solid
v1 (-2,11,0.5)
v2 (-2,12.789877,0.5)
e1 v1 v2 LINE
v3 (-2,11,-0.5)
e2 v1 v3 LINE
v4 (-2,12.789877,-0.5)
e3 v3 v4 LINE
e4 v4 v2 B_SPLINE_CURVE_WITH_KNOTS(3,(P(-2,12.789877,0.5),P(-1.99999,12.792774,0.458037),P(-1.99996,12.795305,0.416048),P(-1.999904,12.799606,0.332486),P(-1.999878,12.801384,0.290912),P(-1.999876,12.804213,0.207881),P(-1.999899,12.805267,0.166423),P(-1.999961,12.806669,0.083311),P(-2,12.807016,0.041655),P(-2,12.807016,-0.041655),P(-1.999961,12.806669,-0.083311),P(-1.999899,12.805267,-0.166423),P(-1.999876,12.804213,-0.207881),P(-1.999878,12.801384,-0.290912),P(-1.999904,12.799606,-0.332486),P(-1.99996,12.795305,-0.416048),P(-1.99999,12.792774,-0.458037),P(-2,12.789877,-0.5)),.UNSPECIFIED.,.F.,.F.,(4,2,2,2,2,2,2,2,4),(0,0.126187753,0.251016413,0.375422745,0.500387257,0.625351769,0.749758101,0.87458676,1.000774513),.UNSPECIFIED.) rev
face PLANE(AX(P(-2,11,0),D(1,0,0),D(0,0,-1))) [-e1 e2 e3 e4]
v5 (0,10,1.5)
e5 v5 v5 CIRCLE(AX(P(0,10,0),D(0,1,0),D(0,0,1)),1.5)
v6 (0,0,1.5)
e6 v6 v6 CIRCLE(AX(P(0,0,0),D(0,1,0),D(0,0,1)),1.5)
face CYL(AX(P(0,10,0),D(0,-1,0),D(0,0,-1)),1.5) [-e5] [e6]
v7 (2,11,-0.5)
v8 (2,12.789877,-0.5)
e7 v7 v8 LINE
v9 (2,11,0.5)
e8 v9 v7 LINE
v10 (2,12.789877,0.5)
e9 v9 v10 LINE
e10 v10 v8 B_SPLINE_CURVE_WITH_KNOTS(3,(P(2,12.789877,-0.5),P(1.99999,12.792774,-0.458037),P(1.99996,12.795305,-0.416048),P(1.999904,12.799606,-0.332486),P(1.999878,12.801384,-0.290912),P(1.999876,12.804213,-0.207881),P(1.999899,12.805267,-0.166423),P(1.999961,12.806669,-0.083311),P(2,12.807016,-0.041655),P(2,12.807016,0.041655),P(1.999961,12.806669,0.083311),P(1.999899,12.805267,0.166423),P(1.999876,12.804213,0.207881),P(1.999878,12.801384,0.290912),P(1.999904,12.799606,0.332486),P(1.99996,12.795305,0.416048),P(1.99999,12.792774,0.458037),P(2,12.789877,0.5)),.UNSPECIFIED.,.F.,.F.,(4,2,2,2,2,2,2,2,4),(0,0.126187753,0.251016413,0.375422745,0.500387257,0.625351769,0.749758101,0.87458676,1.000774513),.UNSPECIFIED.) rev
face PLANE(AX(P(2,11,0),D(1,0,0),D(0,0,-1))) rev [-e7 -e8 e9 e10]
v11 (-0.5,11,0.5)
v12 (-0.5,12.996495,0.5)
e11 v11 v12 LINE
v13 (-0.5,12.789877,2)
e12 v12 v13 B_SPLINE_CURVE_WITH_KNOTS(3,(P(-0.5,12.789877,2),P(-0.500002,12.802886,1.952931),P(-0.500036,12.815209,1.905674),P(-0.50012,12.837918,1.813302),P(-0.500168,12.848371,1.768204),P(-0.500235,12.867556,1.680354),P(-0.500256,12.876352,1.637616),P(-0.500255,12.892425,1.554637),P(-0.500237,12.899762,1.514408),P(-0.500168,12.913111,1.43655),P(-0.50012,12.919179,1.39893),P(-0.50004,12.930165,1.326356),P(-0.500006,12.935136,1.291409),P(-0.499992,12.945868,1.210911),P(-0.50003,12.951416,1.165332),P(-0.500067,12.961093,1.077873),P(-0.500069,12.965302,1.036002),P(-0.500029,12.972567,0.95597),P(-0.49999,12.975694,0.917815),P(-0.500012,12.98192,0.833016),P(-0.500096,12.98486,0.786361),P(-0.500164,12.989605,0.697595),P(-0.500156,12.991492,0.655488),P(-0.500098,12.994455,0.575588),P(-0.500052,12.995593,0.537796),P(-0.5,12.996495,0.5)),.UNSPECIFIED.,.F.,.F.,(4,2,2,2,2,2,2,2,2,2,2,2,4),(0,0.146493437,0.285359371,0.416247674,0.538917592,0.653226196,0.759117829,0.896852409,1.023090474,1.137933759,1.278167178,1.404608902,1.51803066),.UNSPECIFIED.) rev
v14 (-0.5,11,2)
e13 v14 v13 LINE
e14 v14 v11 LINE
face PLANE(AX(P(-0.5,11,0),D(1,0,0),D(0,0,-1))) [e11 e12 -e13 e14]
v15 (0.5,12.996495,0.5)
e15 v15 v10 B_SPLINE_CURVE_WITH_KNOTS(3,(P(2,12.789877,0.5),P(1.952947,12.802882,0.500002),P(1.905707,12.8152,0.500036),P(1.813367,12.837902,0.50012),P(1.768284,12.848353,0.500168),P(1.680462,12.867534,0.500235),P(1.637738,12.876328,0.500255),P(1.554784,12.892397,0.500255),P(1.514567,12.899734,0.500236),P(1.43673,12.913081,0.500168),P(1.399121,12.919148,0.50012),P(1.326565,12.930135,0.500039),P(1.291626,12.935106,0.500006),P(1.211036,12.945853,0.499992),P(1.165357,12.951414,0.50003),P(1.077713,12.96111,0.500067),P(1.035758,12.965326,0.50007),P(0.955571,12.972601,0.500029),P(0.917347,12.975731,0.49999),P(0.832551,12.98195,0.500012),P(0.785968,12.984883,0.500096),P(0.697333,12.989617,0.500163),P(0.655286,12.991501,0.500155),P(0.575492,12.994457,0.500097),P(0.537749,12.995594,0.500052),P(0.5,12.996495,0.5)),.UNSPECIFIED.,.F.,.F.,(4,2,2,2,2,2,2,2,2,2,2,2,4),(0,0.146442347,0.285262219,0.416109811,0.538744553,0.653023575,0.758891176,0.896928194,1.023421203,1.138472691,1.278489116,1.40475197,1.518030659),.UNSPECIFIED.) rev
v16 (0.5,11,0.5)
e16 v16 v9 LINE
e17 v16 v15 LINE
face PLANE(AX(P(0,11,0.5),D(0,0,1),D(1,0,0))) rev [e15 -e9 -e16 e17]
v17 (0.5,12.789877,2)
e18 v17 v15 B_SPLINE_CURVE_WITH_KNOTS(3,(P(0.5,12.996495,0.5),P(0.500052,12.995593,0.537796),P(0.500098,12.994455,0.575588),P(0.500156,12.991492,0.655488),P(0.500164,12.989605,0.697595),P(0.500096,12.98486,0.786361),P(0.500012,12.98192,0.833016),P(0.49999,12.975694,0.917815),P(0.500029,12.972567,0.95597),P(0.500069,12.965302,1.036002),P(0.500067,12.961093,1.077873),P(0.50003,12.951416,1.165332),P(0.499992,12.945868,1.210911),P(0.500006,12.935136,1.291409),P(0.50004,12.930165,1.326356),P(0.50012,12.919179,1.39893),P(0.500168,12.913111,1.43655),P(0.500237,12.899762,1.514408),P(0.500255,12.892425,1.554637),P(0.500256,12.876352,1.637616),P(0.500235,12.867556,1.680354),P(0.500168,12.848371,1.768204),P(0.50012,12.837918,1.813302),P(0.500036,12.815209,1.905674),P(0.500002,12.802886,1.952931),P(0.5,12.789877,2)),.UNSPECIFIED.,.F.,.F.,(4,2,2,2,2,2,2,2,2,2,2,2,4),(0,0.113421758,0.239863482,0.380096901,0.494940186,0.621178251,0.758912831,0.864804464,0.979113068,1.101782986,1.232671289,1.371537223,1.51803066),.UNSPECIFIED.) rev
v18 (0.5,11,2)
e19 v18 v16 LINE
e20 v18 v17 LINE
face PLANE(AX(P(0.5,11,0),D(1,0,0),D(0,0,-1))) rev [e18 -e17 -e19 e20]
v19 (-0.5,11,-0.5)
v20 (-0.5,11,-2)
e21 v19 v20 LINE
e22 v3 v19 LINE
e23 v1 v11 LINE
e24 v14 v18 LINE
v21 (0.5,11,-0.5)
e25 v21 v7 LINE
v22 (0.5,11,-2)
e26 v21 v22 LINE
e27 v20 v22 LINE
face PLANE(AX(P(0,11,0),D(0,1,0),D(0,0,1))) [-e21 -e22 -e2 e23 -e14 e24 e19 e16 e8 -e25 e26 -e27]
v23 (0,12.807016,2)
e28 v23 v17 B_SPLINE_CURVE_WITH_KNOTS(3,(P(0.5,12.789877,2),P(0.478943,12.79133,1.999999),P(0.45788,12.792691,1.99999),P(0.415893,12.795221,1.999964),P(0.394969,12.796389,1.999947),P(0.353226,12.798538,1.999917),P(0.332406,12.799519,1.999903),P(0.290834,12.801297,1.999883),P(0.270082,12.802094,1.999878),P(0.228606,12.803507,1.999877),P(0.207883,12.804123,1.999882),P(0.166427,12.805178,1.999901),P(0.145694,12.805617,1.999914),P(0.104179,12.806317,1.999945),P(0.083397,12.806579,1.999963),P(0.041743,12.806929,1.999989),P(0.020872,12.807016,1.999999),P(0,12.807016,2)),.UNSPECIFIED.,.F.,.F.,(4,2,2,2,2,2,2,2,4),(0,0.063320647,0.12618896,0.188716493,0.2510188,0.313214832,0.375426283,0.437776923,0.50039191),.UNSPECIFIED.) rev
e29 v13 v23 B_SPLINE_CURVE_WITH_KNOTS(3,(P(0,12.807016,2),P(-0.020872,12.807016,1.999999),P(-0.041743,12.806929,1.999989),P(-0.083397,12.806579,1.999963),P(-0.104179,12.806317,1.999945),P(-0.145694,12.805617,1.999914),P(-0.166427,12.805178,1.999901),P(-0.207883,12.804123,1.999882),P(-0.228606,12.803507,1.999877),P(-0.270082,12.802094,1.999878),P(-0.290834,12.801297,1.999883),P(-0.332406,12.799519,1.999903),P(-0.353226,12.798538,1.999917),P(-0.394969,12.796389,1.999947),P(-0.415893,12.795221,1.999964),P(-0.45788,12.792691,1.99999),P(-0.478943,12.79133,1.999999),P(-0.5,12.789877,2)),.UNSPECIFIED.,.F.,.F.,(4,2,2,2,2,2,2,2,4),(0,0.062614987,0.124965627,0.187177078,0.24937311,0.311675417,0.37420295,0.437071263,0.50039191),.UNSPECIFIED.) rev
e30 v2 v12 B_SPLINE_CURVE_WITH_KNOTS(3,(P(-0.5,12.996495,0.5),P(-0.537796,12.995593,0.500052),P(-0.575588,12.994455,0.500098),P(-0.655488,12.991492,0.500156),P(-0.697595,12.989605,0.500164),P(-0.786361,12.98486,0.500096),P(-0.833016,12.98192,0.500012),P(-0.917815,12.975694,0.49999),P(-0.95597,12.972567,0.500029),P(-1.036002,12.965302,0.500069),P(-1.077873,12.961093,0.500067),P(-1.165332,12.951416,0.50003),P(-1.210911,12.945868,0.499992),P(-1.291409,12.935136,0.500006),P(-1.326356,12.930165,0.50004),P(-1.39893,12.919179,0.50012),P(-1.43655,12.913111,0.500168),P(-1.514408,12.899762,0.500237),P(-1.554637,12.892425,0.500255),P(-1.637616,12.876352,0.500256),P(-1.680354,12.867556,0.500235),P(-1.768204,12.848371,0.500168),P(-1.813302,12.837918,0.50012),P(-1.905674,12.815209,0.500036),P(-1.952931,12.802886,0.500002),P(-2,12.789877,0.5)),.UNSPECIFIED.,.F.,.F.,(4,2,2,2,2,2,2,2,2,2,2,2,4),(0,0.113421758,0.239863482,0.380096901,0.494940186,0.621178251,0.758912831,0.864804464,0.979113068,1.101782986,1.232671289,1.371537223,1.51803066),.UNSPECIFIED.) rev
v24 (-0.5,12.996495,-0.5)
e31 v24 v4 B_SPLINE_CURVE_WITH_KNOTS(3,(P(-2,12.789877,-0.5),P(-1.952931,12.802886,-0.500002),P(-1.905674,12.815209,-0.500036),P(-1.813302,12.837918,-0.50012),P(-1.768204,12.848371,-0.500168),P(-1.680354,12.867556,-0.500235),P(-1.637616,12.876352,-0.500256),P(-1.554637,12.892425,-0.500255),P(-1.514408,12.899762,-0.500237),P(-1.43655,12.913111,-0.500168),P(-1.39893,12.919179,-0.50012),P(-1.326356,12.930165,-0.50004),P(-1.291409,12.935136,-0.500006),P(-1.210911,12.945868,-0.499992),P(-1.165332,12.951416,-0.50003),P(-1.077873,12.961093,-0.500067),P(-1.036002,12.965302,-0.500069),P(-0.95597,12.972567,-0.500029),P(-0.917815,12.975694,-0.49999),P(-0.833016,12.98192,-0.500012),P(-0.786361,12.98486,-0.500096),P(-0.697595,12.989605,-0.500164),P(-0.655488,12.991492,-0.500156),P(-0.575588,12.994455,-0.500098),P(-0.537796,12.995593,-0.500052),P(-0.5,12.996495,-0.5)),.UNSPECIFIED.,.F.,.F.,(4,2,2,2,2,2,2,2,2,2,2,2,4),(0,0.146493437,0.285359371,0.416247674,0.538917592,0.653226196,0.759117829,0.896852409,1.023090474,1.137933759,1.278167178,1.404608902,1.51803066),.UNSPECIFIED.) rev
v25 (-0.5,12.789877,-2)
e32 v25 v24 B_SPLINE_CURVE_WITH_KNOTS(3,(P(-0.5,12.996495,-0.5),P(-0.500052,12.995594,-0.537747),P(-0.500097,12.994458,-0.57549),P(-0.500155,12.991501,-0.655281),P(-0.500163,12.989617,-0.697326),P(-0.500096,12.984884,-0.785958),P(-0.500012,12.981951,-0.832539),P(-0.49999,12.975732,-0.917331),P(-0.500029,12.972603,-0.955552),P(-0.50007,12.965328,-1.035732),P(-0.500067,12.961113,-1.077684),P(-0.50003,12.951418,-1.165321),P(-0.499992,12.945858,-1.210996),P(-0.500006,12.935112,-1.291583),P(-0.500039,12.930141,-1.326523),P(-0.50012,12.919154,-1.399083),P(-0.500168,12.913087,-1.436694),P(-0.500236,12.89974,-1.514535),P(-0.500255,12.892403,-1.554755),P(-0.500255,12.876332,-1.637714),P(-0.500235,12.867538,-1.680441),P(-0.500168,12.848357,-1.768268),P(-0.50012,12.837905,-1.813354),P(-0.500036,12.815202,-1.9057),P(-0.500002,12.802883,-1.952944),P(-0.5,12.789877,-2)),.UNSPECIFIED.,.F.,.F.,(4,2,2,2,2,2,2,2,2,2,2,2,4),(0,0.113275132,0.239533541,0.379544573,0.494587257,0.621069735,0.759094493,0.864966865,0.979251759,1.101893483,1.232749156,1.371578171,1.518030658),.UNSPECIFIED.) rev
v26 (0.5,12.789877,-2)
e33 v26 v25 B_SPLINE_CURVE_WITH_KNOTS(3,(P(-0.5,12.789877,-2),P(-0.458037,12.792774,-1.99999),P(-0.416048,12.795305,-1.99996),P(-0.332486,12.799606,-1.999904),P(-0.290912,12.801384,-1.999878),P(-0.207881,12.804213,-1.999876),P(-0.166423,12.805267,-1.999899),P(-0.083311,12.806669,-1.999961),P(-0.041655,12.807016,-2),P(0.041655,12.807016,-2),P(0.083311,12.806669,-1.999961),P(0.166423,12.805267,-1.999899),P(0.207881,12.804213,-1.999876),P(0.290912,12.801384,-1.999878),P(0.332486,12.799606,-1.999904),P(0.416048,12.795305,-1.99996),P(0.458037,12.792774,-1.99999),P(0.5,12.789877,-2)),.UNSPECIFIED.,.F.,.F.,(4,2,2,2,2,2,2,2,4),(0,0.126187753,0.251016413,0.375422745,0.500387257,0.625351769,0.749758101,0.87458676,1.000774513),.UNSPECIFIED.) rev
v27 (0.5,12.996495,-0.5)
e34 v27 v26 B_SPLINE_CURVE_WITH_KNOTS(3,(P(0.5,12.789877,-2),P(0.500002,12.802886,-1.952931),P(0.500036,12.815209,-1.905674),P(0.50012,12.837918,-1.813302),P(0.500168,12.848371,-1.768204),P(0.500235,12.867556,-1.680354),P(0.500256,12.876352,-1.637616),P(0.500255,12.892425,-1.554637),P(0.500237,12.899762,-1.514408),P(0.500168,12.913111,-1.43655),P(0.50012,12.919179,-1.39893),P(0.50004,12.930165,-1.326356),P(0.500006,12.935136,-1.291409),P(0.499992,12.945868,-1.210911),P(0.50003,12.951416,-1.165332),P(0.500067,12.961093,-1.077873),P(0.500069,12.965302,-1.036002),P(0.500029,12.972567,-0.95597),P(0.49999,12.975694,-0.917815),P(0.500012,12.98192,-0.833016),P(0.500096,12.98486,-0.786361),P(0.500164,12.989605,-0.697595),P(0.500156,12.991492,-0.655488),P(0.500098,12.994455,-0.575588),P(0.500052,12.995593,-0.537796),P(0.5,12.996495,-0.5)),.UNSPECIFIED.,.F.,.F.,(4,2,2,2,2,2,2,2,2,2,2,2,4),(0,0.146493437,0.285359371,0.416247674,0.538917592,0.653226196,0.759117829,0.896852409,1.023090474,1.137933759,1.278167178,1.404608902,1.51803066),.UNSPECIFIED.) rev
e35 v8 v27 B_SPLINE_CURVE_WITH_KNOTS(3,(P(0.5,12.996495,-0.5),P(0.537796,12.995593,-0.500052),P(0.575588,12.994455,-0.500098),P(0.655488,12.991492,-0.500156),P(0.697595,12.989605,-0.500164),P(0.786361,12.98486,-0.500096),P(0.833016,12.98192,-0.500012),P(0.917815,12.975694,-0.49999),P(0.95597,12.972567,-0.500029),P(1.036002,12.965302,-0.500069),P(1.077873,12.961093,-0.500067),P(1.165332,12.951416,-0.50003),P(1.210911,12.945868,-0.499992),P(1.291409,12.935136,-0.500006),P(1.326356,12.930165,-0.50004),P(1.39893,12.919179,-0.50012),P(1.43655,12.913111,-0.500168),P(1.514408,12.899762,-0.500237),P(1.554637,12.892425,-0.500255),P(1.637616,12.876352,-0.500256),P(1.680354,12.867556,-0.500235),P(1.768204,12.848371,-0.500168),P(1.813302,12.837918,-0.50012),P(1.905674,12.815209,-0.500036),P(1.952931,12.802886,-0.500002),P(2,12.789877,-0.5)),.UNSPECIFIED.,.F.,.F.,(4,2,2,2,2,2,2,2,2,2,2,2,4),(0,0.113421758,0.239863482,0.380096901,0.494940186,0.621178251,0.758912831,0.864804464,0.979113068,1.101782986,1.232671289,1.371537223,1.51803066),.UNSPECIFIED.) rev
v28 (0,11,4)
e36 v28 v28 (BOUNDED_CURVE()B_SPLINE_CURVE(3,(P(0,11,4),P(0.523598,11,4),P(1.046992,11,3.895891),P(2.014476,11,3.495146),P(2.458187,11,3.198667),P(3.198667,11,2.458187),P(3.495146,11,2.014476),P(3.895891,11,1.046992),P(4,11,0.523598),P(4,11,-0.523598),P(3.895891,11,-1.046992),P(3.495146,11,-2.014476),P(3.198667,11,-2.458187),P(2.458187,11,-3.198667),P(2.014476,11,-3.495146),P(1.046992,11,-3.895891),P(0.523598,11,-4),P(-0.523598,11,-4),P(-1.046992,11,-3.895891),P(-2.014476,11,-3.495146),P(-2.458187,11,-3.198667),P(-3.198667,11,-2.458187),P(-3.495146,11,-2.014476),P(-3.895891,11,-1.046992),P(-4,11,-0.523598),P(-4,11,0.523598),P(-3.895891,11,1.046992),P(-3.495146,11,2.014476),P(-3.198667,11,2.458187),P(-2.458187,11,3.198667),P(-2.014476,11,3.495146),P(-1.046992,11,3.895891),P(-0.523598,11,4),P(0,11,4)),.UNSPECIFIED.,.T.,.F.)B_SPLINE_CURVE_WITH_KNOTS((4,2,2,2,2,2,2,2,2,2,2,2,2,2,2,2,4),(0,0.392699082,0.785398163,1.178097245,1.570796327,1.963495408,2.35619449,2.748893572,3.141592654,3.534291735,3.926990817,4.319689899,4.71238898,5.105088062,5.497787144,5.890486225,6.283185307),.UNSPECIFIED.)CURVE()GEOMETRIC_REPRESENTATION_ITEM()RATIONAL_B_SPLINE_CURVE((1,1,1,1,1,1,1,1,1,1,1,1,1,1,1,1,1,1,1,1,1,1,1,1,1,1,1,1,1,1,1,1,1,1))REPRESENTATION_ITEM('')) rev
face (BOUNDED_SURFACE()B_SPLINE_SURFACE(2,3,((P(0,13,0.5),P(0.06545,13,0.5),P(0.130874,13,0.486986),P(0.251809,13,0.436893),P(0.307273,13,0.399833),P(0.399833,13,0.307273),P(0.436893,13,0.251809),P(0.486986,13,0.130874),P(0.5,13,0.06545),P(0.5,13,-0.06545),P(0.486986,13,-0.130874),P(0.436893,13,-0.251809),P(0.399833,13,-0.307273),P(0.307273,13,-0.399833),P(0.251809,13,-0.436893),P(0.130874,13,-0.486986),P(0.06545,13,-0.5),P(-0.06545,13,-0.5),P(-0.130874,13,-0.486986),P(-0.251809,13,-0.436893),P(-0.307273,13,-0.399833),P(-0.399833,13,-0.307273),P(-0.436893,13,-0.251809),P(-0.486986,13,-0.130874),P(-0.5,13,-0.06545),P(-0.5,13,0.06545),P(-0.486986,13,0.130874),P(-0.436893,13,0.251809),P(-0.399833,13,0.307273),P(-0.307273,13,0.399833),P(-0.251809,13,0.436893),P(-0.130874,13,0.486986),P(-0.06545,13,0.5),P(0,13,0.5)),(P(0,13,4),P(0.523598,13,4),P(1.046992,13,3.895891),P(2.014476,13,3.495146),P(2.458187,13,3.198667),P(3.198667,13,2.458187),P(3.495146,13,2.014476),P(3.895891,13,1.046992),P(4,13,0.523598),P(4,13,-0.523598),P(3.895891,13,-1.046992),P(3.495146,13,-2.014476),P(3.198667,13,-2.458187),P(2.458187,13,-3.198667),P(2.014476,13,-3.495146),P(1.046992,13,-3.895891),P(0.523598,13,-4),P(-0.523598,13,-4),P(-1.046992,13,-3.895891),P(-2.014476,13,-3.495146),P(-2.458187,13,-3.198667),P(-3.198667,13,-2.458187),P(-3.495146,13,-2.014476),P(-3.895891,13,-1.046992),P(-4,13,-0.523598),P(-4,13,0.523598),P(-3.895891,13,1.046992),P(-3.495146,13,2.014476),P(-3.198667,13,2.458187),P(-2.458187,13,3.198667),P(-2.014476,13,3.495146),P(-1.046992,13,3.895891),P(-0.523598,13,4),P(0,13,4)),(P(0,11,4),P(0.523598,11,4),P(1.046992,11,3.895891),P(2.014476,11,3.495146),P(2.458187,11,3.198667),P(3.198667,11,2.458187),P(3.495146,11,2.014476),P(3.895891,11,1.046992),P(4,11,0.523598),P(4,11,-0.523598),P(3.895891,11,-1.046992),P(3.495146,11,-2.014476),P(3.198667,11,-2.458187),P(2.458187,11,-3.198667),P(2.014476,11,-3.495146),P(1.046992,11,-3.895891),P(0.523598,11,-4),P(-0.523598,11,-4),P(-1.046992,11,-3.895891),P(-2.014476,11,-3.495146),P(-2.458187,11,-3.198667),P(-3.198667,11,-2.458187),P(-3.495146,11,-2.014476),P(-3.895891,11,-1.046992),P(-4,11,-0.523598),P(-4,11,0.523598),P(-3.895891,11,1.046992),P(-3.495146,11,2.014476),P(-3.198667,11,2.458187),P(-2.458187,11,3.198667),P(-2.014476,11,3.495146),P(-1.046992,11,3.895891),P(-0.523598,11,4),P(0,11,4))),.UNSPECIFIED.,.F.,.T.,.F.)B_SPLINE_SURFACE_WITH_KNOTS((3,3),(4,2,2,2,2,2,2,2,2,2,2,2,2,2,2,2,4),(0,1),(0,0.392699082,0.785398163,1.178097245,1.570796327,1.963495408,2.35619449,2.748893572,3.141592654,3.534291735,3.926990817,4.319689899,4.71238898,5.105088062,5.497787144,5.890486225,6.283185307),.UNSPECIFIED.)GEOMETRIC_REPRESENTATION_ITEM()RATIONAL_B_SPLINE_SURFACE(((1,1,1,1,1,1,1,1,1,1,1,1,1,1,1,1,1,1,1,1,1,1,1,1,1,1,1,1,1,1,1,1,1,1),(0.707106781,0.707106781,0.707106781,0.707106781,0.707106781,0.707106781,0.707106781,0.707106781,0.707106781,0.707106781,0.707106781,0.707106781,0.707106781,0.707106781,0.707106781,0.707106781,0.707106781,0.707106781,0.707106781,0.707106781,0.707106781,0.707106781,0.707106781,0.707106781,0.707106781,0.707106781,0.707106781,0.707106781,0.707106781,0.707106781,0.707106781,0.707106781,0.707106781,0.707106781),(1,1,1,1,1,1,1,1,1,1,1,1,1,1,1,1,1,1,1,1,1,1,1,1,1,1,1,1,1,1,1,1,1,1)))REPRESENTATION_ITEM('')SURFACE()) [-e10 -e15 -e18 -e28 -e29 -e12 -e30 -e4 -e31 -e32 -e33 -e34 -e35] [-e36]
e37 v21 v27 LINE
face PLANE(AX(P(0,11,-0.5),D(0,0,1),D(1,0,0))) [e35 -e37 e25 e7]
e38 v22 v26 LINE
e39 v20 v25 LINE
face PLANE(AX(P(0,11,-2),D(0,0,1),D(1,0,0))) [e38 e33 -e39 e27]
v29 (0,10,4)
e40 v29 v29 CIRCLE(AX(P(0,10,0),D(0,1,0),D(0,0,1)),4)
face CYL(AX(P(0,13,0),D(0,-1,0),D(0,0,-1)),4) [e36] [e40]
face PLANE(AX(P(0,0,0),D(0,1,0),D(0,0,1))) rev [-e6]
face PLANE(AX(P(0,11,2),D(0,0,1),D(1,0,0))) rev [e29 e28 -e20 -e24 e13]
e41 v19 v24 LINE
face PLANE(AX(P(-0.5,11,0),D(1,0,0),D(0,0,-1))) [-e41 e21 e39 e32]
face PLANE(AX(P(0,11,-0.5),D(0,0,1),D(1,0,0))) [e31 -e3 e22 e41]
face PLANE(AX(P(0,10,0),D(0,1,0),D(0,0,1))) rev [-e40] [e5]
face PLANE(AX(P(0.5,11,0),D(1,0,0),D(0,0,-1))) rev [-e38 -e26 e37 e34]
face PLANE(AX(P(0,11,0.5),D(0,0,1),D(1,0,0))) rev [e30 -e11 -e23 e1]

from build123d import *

# Parameters (mm, degrees)
SKETCH1_R           = 1.5
BOSS_EXTRUDE1_DEPTH = 10
SKETCH2_R           = 4
BOSS_EXTRUDE2_DEPTH = 3
SKETCH3_W           = 1.5
SKETCH3_H           = 1
SKETCH3_W_2         = 1
SKETCH3_H_2         = 1.5
CUT_EXTRUDE1_DEPTH  = 2
FILLET1_SIZE        = 2
FILLET1_SIZE_2      = 3.5


with BuildPart() as part:
    # Sketch1 → Boss-Extrude1 (new body)
    with BuildSketch(Plane(origin=(0, 0, 0), x_dir=(1, 0, 0), z_dir=(0, 1, 0))):
        with Locations(Location((0, 0, 0), (0, 0, 270))):
            Circle(SKETCH1_R)
    extrude(amount=BOSS_EXTRUDE1_DEPTH)

    # Sketch2 → Boss-Extrude2 (add)
    with BuildSketch(Plane(origin=(0, 10, 0), x_dir=(1, 0, 0), z_dir=(0, 1, 0))):
        with Locations(Location((0, 0, 0), (0, 0, 270))):
            Circle(SKETCH2_R)
    extrude(amount=BOSS_EXTRUDE2_DEPTH)

    # Sketch3 → Cut-Extrude1 (cut)
    with BuildSketch(Plane(origin=(0, 13, 0), x_dir=(1, 0, 0), z_dir=(0, 1, 0))):
        with Locations((-1.25, 0)):
            Rectangle(SKETCH3_W, SKETCH3_H)
        Rectangle(SKETCH3_W_2, SKETCH3_H)
        with Locations((0, 1.25)):
            Rectangle(SKETCH3_W_2, SKETCH3_H_2)
        with Locations((1.25, 0)):
            Rectangle(SKETCH3_W, SKETCH3_H)
        with Locations((0, -1.25)):
            Rectangle(SKETCH3_W_2, SKETCH3_H_2)
    extrude(amount=-CUT_EXTRUDE1_DEPTH, mode=Mode.SUBTRACT)

    # Fillet1
    # an asymmetric fillet: 3.5, 2 mm, written as the material it takes off along each edge
    with BuildSketch(Plane(origin=(0, 13, 0), x_dir=(0, 0, 1), z_dir=(-1, 0, 0))) as fillet1_piece_1:
        with BuildLine():
            Bezier((4, -FILLET1_SIZE), (4, 0), (4 - FILLET1_SIZE_2, 0), weights=[1, 0.707106781, 1])
            Line((4 - FILLET1_SIZE_2, 0), (4, 0))
            Line((4, 0), (4, -FILLET1_SIZE))
        make_face()
    revolve(axis=Axis((0, 13, 0), (0, 1, 0)), mode=Mode.SUBTRACT)


solid = part.part
